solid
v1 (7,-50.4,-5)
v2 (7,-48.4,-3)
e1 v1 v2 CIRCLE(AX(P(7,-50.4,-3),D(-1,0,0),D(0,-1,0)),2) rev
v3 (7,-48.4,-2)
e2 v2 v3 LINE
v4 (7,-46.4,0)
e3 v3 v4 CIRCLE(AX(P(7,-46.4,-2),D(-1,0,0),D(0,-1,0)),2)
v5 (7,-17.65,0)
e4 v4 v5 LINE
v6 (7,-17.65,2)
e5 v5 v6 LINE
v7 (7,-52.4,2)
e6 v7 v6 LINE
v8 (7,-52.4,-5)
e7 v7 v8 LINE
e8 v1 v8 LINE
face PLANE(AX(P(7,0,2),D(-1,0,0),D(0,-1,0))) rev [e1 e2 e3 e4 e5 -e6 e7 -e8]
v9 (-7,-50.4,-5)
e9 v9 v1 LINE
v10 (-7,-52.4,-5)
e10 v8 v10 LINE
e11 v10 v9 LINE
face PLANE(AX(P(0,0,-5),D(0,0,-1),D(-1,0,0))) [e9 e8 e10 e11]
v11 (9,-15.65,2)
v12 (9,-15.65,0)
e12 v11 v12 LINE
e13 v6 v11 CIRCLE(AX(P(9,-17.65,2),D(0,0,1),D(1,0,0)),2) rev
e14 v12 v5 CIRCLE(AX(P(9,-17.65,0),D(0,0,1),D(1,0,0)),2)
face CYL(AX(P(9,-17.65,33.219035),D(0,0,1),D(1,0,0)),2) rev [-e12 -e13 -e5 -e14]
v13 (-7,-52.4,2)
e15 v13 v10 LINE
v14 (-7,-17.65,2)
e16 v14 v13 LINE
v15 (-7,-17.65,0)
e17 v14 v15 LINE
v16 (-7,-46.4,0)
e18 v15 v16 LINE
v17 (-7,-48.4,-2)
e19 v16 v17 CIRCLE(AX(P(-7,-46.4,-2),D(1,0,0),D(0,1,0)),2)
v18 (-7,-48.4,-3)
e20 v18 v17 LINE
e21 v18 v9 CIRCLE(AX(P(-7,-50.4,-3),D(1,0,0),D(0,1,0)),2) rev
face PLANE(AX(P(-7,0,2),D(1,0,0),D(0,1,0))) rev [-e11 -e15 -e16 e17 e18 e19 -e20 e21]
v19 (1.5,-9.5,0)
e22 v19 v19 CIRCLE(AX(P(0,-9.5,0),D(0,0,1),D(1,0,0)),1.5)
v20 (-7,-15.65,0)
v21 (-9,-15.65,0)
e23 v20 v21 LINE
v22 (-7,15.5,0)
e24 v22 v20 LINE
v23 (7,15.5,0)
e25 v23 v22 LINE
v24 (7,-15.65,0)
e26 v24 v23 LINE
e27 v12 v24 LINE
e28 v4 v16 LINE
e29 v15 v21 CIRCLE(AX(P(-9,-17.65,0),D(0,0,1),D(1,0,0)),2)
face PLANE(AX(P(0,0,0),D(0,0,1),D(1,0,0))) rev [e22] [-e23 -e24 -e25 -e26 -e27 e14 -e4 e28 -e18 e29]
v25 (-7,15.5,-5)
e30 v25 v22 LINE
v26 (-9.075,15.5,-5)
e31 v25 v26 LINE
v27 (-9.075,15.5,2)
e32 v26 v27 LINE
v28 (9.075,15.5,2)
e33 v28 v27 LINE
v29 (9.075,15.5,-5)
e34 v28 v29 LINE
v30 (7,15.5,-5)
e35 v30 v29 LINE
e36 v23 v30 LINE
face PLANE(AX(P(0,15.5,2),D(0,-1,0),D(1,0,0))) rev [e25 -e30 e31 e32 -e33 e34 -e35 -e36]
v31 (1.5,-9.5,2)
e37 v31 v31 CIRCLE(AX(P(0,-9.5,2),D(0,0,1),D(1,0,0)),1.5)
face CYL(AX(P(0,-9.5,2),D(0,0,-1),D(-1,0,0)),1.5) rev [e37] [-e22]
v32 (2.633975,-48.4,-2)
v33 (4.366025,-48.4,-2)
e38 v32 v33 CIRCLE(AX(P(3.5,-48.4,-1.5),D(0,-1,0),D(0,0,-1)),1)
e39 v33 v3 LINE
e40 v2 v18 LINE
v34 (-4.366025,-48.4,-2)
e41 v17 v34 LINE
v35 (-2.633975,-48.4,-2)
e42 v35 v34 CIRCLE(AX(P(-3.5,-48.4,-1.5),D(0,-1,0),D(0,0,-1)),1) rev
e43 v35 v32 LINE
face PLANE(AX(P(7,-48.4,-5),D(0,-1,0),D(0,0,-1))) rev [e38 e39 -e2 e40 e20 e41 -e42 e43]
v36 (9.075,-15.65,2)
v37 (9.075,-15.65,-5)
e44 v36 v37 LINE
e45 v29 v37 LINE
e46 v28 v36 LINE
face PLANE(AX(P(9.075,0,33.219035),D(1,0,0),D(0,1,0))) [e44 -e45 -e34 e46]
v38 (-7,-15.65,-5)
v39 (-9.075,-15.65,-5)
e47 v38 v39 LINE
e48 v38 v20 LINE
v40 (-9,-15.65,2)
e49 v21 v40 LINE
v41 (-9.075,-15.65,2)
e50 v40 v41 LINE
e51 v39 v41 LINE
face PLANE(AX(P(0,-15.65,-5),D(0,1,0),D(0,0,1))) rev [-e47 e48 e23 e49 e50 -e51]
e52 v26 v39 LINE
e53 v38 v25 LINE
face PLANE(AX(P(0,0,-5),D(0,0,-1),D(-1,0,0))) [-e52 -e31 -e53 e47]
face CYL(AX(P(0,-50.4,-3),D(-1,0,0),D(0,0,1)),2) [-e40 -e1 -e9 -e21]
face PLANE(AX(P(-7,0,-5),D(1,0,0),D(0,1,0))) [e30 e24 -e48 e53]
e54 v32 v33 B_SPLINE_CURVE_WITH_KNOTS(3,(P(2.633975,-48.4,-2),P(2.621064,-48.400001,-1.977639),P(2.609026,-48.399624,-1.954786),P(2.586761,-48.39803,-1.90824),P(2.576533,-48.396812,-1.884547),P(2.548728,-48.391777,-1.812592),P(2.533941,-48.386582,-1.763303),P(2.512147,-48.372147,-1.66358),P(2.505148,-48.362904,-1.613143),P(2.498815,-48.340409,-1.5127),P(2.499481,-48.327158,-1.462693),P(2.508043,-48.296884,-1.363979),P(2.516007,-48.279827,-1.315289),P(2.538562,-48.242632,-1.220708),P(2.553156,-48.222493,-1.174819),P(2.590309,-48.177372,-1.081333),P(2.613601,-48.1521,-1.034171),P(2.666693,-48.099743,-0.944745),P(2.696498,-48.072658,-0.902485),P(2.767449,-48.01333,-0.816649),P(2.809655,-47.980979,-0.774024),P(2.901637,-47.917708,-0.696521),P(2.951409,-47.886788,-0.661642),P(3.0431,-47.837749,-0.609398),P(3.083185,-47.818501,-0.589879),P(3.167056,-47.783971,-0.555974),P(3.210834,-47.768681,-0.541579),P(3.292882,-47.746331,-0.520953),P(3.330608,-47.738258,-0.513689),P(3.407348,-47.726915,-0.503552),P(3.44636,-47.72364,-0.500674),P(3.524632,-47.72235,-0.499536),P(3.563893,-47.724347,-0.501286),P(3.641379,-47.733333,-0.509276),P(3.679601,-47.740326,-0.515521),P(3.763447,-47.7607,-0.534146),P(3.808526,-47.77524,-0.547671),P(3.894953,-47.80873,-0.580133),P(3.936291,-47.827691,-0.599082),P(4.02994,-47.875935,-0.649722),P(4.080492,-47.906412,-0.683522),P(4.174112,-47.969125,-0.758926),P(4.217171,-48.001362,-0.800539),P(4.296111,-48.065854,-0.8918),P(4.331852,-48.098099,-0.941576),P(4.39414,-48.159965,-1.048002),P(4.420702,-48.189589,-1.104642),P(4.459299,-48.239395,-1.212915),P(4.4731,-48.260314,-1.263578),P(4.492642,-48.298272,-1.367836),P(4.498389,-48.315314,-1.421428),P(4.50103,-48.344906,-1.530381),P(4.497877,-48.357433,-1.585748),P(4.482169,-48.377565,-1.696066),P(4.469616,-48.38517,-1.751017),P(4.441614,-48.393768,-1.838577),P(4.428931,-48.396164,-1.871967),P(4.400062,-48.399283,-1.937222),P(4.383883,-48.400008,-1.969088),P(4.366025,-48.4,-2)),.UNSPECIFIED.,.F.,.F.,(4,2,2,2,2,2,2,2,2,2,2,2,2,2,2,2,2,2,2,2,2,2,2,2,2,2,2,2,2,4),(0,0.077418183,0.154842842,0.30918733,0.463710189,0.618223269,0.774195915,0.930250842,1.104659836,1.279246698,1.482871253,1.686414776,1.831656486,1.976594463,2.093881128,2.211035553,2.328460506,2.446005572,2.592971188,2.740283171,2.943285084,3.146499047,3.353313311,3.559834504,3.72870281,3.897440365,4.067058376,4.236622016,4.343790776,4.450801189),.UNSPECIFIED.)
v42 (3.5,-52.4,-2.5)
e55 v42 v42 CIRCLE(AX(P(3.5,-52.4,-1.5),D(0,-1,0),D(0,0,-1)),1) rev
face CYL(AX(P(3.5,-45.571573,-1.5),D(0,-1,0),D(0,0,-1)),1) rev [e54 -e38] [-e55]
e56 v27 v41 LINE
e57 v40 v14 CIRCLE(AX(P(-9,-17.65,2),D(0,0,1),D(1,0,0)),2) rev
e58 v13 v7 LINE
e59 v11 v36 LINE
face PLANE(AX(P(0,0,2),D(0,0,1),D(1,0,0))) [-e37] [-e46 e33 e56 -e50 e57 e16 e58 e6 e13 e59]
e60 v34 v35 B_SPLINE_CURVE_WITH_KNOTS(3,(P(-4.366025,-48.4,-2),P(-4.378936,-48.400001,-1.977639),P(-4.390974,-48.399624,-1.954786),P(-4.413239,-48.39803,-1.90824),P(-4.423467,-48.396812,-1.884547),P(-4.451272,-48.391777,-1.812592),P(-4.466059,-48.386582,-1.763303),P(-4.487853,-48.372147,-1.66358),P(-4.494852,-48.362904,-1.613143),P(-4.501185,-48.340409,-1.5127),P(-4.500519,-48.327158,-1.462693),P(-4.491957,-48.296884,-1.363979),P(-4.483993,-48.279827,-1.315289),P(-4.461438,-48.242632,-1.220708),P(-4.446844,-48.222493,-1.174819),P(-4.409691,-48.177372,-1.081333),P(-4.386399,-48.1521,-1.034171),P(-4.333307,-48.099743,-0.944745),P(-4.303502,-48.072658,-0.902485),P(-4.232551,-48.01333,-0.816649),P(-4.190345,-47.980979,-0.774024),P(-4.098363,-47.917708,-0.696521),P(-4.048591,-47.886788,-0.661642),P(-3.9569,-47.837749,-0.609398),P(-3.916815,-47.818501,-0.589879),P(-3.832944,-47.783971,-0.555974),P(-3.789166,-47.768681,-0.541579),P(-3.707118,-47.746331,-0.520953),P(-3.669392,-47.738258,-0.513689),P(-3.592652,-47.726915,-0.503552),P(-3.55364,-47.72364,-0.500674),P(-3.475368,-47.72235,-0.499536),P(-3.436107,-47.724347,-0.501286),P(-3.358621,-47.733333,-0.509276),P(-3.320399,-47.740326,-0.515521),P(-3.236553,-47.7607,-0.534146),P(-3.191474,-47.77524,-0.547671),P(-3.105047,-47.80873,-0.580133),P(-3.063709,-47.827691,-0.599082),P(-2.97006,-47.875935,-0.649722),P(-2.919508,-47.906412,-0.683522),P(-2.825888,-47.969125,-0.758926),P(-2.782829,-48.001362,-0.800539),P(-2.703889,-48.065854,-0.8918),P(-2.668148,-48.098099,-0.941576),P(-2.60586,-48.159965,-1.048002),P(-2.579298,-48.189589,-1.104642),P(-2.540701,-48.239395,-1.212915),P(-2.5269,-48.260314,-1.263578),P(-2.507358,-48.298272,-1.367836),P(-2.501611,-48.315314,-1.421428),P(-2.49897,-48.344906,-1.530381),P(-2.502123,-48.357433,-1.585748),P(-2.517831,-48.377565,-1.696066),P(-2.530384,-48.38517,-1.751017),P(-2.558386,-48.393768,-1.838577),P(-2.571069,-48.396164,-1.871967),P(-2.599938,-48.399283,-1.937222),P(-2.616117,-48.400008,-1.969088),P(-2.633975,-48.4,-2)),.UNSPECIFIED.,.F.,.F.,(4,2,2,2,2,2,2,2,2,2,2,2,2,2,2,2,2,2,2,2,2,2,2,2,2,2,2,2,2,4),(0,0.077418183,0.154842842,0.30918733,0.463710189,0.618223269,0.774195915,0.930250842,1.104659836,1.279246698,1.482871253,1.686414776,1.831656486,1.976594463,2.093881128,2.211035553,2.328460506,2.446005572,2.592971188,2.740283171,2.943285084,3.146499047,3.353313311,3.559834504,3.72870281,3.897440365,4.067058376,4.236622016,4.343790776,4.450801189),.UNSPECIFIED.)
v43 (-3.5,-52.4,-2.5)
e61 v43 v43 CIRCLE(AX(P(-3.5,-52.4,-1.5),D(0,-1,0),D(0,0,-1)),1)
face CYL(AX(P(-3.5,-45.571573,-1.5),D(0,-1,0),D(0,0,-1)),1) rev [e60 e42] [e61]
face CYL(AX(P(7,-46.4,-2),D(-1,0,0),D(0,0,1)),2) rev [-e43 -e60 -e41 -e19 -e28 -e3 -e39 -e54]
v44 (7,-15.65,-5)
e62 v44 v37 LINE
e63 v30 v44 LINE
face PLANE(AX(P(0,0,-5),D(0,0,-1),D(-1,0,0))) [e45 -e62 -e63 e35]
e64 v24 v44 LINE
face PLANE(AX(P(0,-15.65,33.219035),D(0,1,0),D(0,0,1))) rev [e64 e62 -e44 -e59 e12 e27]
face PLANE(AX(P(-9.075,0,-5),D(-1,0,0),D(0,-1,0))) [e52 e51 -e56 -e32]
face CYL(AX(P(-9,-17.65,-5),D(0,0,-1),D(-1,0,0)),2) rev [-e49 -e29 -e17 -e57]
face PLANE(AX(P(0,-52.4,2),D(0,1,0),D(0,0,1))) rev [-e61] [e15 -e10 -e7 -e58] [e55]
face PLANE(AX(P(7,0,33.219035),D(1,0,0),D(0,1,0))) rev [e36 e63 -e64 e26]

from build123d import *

# Parameters (mm, degrees)
SKETCH2_W                       = 14
SKETCH2_H                       = 31
SKETCH2_R                       = 1.5
SKETCH2_H_2                     = 36.9
BOSS_EXTRUDE1_DEPTH             = 2
SKETCH3_W                       = 14
SKETCH3_H                       = 4
BOSS_EXTRUDE2_DEPTH             = 5
SKETCH4_R                       = 1
CUT_EXTRUDE1_DEPTH              = 4
SKETCH5_W                       = 0.075
SKETCH5_H                       = 31
SKETCH5_H_2                     = 0.15
BOSS_EXTRUDE3_DEPTH             = 5
BOSS_EXTRUDE3_DIRECTION_2_REACH = 55.101
FILLET1_R                       = 2


with BuildPart() as part:
    # Sketch2 → Boss-Extrude1 (new body)
    # profile 1 of 3: a face of its own
    with BuildSketch(Plane.XY):
        Rectangle(SKETCH2_W, SKETCH2_H)
        with BuildLine():
            ThreePointArc((1.7, -9.5), (0, -11.2), (-1.7, -9.5))
            ThreePointArc((-1.7, -9.5), (0, -7.8), (1.7, -9.5))
        make_face(mode=Mode.SUBTRACT)
    # profile 2 of 3: a face of its own
    with BuildSketch(Plane.XY):
        with BuildLine():
            ThreePointArc((-1.7, -9.5), (0, -7.8), (1.7, -9.5))
            ThreePointArc((1.7, -9.5), (0, -11.2), (-1.7, -9.5))
        make_face()
        with Locations((0, -9.5)):
            Circle(SKETCH2_R, mode=Mode.SUBTRACT)
    # profile 3 of 3: a face of its own
    with BuildSketch(Plane.XY):
        with Locations((0, -33.95)):
            Rectangle(SKETCH2_W, SKETCH2_H_2)
    extrude(amount=BOSS_EXTRUDE1_DEPTH)

    # Sketch3 → Boss-Extrude2 (add)
    with BuildSketch(Plane(origin=(0, 0, 0), x_dir=(-1, 0, 0), z_dir=(0, 0, -1))):
        with Locations((0, -50.4)):
            Rectangle(SKETCH3_W, SKETCH3_H)
    extrude(amount=BOSS_EXTRUDE2_DEPTH)

    # Sketch4 → Cut-Extrude1 (cut)
    with BuildSketch(Plane.XZ.offset(52.4)):
        with Locations(Location((-3.5, -1.5, 0), (0, 0, 270))):
            Circle(SKETCH4_R)
        with Locations(Location((3.5, -1.5, 0), (0, 0, 270))):
            Circle(SKETCH4_R)
    extrude(amount=-CUT_EXTRUDE1_DEPTH, mode=Mode.SUBTRACT)

    # Sketch5 → Boss-Extrude3 (add)
    with BuildSketch(Plane(origin=(0, 0, 0), x_dir=(-1, 0, 0), z_dir=(0, 0, -1))):
        Polygon((-7.075, -15.65), (-7.075, -15.5), (-7.075, 15.5), (-9.075, 15.5), (-9.075, -15.65), align=None)
        Polygon((7.075, 15.5), (7.075, -15.5), (7.075, -15.65), (9.075, -15.65), (9.075, 15.5), align=None)
        with Locations((7.0375, 0)):
            Rectangle(SKETCH5_W, SKETCH5_H)
        with Locations((-7.0375, 0)):
            Rectangle(SKETCH5_W, SKETCH5_H)
        with Locations((-7.0375, -15.575)):
            Rectangle(SKETCH5_W, SKETCH5_H_2)
        with Locations((7.0375, -15.575)):
            Rectangle(SKETCH5_W, SKETCH5_H_2)
    extrude(amount=BOSS_EXTRUDE3_DEPTH)

    # Boss-Extrude3 direction 2: up to this face of the body (flat: up to its plane)
    boss_extrude3_direction_2_end = Plane(part.part.faces().sort_by_distance((0, -18.517050043, 2))[0])
    # Sketch5 → Boss-Extrude3 direction 2 (add, up to the picked face)
    with BuildSketch(Plane(origin=(0, 0, 0), x_dir=(-1, 0, 0), z_dir=(0, 0, -1)), mode=Mode.PRIVATE) as boss_extrude3_direction_2_sk1:
        Polygon((-7.075, -15.65), (-7.075, -15.5), (-7.075, 15.5), (-9.075, 15.5), (-9.075, -15.65), align=None)
    boss_extrude3_direction_2_tool1 = split(extrude(boss_extrude3_direction_2_sk1.sketch, amount=-BOSS_EXTRUDE3_DIRECTION_2_REACH, mode=Mode.PRIVATE), bisect_by=boss_extrude3_direction_2_end, keep=Keep.BOTH, mode=Mode.PRIVATE)
    # Sketch5 → Boss-Extrude3 direction 2 (add, up to the picked face)
    with BuildSketch(Plane(origin=(0, 0, 0), x_dir=(-1, 0, 0), z_dir=(0, 0, -1)), mode=Mode.PRIVATE) as boss_extrude3_direction_2_sk2:
        Polygon((7.075, 15.5), (7.075, -15.5), (7.075, -15.65), (9.075, -15.65), (9.075, 15.5), align=None)
    boss_extrude3_direction_2_tool2 = split(extrude(boss_extrude3_direction_2_sk2.sketch, amount=-BOSS_EXTRUDE3_DIRECTION_2_REACH, mode=Mode.PRIVATE), bisect_by=boss_extrude3_direction_2_end, keep=Keep.BOTH, mode=Mode.PRIVATE)
    # Sketch5 → Boss-Extrude3 direction 2 (add, up to the picked face)
    with BuildSketch(Plane(origin=(0, 0, 0), x_dir=(-1, 0, 0), z_dir=(0, 0, -1)), mode=Mode.PRIVATE) as boss_extrude3_direction_2_sk3:
        with Locations((7.0375, 0)):
            Rectangle(SKETCH5_W, SKETCH5_H)
    boss_extrude3_direction_2_tool3 = split(extrude(boss_extrude3_direction_2_sk3.sketch, amount=-BOSS_EXTRUDE3_DIRECTION_2_REACH, mode=Mode.PRIVATE), bisect_by=boss_extrude3_direction_2_end, keep=Keep.BOTH, mode=Mode.PRIVATE)
    # Sketch5 → Boss-Extrude3 direction 2 (add, up to the picked face)
    with BuildSketch(Plane(origin=(0, 0, 0), x_dir=(-1, 0, 0), z_dir=(0, 0, -1)), mode=Mode.PRIVATE) as boss_extrude3_direction_2_sk4:
        with Locations((-7.0375, 0)):
            Rectangle(SKETCH5_W, SKETCH5_H)
    boss_extrude3_direction_2_tool4 = split(extrude(boss_extrude3_direction_2_sk4.sketch, amount=-BOSS_EXTRUDE3_DIRECTION_2_REACH, mode=Mode.PRIVATE), bisect_by=boss_extrude3_direction_2_end, keep=Keep.BOTH, mode=Mode.PRIVATE)
    # Sketch5 → Boss-Extrude3 direction 2 (add, up to the picked face)
    with BuildSketch(Plane(origin=(0, 0, 0), x_dir=(-1, 0, 0), z_dir=(0, 0, -1)), mode=Mode.PRIVATE) as boss_extrude3_direction_2_sk5:
        with Locations((-7.0375, -15.575)):
            Rectangle(SKETCH5_W, SKETCH5_H_2)
    boss_extrude3_direction_2_tool5 = split(extrude(boss_extrude3_direction_2_sk5.sketch, amount=-BOSS_EXTRUDE3_DIRECTION_2_REACH, mode=Mode.PRIVATE), bisect_by=boss_extrude3_direction_2_end, keep=Keep.BOTH, mode=Mode.PRIVATE)
    # Sketch5 → Boss-Extrude3 direction 2 (add, up to the picked face)
    with BuildSketch(Plane(origin=(0, 0, 0), x_dir=(-1, 0, 0), z_dir=(0, 0, -1)), mode=Mode.PRIVATE) as boss_extrude3_direction_2_sk6:
        with Locations((7.0375, -15.575)):
            Rectangle(SKETCH5_W, SKETCH5_H_2)
    boss_extrude3_direction_2_tool6 = split(extrude(boss_extrude3_direction_2_sk6.sketch, amount=-BOSS_EXTRUDE3_DIRECTION_2_REACH, mode=Mode.PRIVATE), bisect_by=boss_extrude3_direction_2_end, keep=Keep.BOTH, mode=Mode.PRIVATE)
    add(boss_extrude3_direction_2_tool1.solids().sort_by(Axis((8.075, -0.075, 0), (0, 0, 1)))[0])
    add(boss_extrude3_direction_2_tool2.solids().sort_by(Axis((-8.075, -0.075, 0), (0, 0, 1)))[0])
    add(boss_extrude3_direction_2_tool3.solids().sort_by(Axis((-7.0375, 0, 0), (0, 0, 1)))[0])
    add(boss_extrude3_direction_2_tool4.solids().sort_by(Axis((7.0375, 0, 0), (0, 0, 1)))[0])
    add(boss_extrude3_direction_2_tool5.solids().sort_by(Axis((7.0375, -15.575, 0), (0, 0, 1)))[0])
    add(boss_extrude3_direction_2_tool6.solids().sort_by(Axis((-7.0375, -15.575, 0), (0, 0, 1)))[0])

    # Fillet1
    # the kernel refuses this fillet: 2 mm, written as the material it adds along each edge
    with BuildSketch(Plane(origin=(7, -48.4, 0), x_dir=(0, 0, -1), z_dir=(-1, 0, 0))) as fillet1_piece_1_section:
        with BuildLine():
            CenterArc((FILLET1_R, -FILLET1_R), FILLET1_R, 90, 90)
            Line((0, -FILLET1_R), (0, 0))
            Line((0, 0), (FILLET1_R, 0))
        make_face()
    fillet1_piece_1 = extrude(amount=14, mode=Mode.PRIVATE)
    fillet1_piece_1 = fillet1_piece_1 - Plane(origin=(-3.5, -47.93211331, -1.5), x_dir=(0, 0, -1), z_dir=(0, -1, 0)) * Cylinder(1, 37, mode=Mode.PRIVATE)
    fillet1_piece_1 = fillet1_piece_1 - Plane(origin=(3.5, -47.93211331, -1.5), x_dir=(0, 0, -1), z_dir=(0, -1, 0)) * Cylinder(1, 37, mode=Mode.PRIVATE)
    add(fillet1_piece_1)
    with BuildSketch(Plane(origin=(7, -15.65, 0), x_dir=(0, -1, 0), z_dir=(0, 0, 1)), Plane(origin=(-7, -15.65, 0), x_dir=(-1, 0, 0), z_dir=(0, 0, 1))) as fillet1_piece_2:
        with BuildLine():
            CenterArc((FILLET1_R, FILLET1_R), FILLET1_R, 180, 90)
            Line((0, FILLET1_R), (0, 0))
            Line((0, 0), (FILLET1_R, 0))
        make_face()
    extrude(amount=2)
    # the kernel refuses this fillet: 2 mm, written as the material it takes off along each edge
    with BuildSketch(Plane(origin=(12, -48.4, -5), x_dir=(0, 0, 1), z_dir=(-1, 0, 0))) as fillet1_2_piece_1:
        with BuildLine():
            CenterArc((FILLET1_R, -FILLET1_R), FILLET1_R, 90, 90)
            Line((0, -FILLET1_R), (0, 0))
            Line((0, 0), (FILLET1_R, 0))
        make_face()
    extrude(amount=24, mode=Mode.SUBTRACT)


solid = part.part
